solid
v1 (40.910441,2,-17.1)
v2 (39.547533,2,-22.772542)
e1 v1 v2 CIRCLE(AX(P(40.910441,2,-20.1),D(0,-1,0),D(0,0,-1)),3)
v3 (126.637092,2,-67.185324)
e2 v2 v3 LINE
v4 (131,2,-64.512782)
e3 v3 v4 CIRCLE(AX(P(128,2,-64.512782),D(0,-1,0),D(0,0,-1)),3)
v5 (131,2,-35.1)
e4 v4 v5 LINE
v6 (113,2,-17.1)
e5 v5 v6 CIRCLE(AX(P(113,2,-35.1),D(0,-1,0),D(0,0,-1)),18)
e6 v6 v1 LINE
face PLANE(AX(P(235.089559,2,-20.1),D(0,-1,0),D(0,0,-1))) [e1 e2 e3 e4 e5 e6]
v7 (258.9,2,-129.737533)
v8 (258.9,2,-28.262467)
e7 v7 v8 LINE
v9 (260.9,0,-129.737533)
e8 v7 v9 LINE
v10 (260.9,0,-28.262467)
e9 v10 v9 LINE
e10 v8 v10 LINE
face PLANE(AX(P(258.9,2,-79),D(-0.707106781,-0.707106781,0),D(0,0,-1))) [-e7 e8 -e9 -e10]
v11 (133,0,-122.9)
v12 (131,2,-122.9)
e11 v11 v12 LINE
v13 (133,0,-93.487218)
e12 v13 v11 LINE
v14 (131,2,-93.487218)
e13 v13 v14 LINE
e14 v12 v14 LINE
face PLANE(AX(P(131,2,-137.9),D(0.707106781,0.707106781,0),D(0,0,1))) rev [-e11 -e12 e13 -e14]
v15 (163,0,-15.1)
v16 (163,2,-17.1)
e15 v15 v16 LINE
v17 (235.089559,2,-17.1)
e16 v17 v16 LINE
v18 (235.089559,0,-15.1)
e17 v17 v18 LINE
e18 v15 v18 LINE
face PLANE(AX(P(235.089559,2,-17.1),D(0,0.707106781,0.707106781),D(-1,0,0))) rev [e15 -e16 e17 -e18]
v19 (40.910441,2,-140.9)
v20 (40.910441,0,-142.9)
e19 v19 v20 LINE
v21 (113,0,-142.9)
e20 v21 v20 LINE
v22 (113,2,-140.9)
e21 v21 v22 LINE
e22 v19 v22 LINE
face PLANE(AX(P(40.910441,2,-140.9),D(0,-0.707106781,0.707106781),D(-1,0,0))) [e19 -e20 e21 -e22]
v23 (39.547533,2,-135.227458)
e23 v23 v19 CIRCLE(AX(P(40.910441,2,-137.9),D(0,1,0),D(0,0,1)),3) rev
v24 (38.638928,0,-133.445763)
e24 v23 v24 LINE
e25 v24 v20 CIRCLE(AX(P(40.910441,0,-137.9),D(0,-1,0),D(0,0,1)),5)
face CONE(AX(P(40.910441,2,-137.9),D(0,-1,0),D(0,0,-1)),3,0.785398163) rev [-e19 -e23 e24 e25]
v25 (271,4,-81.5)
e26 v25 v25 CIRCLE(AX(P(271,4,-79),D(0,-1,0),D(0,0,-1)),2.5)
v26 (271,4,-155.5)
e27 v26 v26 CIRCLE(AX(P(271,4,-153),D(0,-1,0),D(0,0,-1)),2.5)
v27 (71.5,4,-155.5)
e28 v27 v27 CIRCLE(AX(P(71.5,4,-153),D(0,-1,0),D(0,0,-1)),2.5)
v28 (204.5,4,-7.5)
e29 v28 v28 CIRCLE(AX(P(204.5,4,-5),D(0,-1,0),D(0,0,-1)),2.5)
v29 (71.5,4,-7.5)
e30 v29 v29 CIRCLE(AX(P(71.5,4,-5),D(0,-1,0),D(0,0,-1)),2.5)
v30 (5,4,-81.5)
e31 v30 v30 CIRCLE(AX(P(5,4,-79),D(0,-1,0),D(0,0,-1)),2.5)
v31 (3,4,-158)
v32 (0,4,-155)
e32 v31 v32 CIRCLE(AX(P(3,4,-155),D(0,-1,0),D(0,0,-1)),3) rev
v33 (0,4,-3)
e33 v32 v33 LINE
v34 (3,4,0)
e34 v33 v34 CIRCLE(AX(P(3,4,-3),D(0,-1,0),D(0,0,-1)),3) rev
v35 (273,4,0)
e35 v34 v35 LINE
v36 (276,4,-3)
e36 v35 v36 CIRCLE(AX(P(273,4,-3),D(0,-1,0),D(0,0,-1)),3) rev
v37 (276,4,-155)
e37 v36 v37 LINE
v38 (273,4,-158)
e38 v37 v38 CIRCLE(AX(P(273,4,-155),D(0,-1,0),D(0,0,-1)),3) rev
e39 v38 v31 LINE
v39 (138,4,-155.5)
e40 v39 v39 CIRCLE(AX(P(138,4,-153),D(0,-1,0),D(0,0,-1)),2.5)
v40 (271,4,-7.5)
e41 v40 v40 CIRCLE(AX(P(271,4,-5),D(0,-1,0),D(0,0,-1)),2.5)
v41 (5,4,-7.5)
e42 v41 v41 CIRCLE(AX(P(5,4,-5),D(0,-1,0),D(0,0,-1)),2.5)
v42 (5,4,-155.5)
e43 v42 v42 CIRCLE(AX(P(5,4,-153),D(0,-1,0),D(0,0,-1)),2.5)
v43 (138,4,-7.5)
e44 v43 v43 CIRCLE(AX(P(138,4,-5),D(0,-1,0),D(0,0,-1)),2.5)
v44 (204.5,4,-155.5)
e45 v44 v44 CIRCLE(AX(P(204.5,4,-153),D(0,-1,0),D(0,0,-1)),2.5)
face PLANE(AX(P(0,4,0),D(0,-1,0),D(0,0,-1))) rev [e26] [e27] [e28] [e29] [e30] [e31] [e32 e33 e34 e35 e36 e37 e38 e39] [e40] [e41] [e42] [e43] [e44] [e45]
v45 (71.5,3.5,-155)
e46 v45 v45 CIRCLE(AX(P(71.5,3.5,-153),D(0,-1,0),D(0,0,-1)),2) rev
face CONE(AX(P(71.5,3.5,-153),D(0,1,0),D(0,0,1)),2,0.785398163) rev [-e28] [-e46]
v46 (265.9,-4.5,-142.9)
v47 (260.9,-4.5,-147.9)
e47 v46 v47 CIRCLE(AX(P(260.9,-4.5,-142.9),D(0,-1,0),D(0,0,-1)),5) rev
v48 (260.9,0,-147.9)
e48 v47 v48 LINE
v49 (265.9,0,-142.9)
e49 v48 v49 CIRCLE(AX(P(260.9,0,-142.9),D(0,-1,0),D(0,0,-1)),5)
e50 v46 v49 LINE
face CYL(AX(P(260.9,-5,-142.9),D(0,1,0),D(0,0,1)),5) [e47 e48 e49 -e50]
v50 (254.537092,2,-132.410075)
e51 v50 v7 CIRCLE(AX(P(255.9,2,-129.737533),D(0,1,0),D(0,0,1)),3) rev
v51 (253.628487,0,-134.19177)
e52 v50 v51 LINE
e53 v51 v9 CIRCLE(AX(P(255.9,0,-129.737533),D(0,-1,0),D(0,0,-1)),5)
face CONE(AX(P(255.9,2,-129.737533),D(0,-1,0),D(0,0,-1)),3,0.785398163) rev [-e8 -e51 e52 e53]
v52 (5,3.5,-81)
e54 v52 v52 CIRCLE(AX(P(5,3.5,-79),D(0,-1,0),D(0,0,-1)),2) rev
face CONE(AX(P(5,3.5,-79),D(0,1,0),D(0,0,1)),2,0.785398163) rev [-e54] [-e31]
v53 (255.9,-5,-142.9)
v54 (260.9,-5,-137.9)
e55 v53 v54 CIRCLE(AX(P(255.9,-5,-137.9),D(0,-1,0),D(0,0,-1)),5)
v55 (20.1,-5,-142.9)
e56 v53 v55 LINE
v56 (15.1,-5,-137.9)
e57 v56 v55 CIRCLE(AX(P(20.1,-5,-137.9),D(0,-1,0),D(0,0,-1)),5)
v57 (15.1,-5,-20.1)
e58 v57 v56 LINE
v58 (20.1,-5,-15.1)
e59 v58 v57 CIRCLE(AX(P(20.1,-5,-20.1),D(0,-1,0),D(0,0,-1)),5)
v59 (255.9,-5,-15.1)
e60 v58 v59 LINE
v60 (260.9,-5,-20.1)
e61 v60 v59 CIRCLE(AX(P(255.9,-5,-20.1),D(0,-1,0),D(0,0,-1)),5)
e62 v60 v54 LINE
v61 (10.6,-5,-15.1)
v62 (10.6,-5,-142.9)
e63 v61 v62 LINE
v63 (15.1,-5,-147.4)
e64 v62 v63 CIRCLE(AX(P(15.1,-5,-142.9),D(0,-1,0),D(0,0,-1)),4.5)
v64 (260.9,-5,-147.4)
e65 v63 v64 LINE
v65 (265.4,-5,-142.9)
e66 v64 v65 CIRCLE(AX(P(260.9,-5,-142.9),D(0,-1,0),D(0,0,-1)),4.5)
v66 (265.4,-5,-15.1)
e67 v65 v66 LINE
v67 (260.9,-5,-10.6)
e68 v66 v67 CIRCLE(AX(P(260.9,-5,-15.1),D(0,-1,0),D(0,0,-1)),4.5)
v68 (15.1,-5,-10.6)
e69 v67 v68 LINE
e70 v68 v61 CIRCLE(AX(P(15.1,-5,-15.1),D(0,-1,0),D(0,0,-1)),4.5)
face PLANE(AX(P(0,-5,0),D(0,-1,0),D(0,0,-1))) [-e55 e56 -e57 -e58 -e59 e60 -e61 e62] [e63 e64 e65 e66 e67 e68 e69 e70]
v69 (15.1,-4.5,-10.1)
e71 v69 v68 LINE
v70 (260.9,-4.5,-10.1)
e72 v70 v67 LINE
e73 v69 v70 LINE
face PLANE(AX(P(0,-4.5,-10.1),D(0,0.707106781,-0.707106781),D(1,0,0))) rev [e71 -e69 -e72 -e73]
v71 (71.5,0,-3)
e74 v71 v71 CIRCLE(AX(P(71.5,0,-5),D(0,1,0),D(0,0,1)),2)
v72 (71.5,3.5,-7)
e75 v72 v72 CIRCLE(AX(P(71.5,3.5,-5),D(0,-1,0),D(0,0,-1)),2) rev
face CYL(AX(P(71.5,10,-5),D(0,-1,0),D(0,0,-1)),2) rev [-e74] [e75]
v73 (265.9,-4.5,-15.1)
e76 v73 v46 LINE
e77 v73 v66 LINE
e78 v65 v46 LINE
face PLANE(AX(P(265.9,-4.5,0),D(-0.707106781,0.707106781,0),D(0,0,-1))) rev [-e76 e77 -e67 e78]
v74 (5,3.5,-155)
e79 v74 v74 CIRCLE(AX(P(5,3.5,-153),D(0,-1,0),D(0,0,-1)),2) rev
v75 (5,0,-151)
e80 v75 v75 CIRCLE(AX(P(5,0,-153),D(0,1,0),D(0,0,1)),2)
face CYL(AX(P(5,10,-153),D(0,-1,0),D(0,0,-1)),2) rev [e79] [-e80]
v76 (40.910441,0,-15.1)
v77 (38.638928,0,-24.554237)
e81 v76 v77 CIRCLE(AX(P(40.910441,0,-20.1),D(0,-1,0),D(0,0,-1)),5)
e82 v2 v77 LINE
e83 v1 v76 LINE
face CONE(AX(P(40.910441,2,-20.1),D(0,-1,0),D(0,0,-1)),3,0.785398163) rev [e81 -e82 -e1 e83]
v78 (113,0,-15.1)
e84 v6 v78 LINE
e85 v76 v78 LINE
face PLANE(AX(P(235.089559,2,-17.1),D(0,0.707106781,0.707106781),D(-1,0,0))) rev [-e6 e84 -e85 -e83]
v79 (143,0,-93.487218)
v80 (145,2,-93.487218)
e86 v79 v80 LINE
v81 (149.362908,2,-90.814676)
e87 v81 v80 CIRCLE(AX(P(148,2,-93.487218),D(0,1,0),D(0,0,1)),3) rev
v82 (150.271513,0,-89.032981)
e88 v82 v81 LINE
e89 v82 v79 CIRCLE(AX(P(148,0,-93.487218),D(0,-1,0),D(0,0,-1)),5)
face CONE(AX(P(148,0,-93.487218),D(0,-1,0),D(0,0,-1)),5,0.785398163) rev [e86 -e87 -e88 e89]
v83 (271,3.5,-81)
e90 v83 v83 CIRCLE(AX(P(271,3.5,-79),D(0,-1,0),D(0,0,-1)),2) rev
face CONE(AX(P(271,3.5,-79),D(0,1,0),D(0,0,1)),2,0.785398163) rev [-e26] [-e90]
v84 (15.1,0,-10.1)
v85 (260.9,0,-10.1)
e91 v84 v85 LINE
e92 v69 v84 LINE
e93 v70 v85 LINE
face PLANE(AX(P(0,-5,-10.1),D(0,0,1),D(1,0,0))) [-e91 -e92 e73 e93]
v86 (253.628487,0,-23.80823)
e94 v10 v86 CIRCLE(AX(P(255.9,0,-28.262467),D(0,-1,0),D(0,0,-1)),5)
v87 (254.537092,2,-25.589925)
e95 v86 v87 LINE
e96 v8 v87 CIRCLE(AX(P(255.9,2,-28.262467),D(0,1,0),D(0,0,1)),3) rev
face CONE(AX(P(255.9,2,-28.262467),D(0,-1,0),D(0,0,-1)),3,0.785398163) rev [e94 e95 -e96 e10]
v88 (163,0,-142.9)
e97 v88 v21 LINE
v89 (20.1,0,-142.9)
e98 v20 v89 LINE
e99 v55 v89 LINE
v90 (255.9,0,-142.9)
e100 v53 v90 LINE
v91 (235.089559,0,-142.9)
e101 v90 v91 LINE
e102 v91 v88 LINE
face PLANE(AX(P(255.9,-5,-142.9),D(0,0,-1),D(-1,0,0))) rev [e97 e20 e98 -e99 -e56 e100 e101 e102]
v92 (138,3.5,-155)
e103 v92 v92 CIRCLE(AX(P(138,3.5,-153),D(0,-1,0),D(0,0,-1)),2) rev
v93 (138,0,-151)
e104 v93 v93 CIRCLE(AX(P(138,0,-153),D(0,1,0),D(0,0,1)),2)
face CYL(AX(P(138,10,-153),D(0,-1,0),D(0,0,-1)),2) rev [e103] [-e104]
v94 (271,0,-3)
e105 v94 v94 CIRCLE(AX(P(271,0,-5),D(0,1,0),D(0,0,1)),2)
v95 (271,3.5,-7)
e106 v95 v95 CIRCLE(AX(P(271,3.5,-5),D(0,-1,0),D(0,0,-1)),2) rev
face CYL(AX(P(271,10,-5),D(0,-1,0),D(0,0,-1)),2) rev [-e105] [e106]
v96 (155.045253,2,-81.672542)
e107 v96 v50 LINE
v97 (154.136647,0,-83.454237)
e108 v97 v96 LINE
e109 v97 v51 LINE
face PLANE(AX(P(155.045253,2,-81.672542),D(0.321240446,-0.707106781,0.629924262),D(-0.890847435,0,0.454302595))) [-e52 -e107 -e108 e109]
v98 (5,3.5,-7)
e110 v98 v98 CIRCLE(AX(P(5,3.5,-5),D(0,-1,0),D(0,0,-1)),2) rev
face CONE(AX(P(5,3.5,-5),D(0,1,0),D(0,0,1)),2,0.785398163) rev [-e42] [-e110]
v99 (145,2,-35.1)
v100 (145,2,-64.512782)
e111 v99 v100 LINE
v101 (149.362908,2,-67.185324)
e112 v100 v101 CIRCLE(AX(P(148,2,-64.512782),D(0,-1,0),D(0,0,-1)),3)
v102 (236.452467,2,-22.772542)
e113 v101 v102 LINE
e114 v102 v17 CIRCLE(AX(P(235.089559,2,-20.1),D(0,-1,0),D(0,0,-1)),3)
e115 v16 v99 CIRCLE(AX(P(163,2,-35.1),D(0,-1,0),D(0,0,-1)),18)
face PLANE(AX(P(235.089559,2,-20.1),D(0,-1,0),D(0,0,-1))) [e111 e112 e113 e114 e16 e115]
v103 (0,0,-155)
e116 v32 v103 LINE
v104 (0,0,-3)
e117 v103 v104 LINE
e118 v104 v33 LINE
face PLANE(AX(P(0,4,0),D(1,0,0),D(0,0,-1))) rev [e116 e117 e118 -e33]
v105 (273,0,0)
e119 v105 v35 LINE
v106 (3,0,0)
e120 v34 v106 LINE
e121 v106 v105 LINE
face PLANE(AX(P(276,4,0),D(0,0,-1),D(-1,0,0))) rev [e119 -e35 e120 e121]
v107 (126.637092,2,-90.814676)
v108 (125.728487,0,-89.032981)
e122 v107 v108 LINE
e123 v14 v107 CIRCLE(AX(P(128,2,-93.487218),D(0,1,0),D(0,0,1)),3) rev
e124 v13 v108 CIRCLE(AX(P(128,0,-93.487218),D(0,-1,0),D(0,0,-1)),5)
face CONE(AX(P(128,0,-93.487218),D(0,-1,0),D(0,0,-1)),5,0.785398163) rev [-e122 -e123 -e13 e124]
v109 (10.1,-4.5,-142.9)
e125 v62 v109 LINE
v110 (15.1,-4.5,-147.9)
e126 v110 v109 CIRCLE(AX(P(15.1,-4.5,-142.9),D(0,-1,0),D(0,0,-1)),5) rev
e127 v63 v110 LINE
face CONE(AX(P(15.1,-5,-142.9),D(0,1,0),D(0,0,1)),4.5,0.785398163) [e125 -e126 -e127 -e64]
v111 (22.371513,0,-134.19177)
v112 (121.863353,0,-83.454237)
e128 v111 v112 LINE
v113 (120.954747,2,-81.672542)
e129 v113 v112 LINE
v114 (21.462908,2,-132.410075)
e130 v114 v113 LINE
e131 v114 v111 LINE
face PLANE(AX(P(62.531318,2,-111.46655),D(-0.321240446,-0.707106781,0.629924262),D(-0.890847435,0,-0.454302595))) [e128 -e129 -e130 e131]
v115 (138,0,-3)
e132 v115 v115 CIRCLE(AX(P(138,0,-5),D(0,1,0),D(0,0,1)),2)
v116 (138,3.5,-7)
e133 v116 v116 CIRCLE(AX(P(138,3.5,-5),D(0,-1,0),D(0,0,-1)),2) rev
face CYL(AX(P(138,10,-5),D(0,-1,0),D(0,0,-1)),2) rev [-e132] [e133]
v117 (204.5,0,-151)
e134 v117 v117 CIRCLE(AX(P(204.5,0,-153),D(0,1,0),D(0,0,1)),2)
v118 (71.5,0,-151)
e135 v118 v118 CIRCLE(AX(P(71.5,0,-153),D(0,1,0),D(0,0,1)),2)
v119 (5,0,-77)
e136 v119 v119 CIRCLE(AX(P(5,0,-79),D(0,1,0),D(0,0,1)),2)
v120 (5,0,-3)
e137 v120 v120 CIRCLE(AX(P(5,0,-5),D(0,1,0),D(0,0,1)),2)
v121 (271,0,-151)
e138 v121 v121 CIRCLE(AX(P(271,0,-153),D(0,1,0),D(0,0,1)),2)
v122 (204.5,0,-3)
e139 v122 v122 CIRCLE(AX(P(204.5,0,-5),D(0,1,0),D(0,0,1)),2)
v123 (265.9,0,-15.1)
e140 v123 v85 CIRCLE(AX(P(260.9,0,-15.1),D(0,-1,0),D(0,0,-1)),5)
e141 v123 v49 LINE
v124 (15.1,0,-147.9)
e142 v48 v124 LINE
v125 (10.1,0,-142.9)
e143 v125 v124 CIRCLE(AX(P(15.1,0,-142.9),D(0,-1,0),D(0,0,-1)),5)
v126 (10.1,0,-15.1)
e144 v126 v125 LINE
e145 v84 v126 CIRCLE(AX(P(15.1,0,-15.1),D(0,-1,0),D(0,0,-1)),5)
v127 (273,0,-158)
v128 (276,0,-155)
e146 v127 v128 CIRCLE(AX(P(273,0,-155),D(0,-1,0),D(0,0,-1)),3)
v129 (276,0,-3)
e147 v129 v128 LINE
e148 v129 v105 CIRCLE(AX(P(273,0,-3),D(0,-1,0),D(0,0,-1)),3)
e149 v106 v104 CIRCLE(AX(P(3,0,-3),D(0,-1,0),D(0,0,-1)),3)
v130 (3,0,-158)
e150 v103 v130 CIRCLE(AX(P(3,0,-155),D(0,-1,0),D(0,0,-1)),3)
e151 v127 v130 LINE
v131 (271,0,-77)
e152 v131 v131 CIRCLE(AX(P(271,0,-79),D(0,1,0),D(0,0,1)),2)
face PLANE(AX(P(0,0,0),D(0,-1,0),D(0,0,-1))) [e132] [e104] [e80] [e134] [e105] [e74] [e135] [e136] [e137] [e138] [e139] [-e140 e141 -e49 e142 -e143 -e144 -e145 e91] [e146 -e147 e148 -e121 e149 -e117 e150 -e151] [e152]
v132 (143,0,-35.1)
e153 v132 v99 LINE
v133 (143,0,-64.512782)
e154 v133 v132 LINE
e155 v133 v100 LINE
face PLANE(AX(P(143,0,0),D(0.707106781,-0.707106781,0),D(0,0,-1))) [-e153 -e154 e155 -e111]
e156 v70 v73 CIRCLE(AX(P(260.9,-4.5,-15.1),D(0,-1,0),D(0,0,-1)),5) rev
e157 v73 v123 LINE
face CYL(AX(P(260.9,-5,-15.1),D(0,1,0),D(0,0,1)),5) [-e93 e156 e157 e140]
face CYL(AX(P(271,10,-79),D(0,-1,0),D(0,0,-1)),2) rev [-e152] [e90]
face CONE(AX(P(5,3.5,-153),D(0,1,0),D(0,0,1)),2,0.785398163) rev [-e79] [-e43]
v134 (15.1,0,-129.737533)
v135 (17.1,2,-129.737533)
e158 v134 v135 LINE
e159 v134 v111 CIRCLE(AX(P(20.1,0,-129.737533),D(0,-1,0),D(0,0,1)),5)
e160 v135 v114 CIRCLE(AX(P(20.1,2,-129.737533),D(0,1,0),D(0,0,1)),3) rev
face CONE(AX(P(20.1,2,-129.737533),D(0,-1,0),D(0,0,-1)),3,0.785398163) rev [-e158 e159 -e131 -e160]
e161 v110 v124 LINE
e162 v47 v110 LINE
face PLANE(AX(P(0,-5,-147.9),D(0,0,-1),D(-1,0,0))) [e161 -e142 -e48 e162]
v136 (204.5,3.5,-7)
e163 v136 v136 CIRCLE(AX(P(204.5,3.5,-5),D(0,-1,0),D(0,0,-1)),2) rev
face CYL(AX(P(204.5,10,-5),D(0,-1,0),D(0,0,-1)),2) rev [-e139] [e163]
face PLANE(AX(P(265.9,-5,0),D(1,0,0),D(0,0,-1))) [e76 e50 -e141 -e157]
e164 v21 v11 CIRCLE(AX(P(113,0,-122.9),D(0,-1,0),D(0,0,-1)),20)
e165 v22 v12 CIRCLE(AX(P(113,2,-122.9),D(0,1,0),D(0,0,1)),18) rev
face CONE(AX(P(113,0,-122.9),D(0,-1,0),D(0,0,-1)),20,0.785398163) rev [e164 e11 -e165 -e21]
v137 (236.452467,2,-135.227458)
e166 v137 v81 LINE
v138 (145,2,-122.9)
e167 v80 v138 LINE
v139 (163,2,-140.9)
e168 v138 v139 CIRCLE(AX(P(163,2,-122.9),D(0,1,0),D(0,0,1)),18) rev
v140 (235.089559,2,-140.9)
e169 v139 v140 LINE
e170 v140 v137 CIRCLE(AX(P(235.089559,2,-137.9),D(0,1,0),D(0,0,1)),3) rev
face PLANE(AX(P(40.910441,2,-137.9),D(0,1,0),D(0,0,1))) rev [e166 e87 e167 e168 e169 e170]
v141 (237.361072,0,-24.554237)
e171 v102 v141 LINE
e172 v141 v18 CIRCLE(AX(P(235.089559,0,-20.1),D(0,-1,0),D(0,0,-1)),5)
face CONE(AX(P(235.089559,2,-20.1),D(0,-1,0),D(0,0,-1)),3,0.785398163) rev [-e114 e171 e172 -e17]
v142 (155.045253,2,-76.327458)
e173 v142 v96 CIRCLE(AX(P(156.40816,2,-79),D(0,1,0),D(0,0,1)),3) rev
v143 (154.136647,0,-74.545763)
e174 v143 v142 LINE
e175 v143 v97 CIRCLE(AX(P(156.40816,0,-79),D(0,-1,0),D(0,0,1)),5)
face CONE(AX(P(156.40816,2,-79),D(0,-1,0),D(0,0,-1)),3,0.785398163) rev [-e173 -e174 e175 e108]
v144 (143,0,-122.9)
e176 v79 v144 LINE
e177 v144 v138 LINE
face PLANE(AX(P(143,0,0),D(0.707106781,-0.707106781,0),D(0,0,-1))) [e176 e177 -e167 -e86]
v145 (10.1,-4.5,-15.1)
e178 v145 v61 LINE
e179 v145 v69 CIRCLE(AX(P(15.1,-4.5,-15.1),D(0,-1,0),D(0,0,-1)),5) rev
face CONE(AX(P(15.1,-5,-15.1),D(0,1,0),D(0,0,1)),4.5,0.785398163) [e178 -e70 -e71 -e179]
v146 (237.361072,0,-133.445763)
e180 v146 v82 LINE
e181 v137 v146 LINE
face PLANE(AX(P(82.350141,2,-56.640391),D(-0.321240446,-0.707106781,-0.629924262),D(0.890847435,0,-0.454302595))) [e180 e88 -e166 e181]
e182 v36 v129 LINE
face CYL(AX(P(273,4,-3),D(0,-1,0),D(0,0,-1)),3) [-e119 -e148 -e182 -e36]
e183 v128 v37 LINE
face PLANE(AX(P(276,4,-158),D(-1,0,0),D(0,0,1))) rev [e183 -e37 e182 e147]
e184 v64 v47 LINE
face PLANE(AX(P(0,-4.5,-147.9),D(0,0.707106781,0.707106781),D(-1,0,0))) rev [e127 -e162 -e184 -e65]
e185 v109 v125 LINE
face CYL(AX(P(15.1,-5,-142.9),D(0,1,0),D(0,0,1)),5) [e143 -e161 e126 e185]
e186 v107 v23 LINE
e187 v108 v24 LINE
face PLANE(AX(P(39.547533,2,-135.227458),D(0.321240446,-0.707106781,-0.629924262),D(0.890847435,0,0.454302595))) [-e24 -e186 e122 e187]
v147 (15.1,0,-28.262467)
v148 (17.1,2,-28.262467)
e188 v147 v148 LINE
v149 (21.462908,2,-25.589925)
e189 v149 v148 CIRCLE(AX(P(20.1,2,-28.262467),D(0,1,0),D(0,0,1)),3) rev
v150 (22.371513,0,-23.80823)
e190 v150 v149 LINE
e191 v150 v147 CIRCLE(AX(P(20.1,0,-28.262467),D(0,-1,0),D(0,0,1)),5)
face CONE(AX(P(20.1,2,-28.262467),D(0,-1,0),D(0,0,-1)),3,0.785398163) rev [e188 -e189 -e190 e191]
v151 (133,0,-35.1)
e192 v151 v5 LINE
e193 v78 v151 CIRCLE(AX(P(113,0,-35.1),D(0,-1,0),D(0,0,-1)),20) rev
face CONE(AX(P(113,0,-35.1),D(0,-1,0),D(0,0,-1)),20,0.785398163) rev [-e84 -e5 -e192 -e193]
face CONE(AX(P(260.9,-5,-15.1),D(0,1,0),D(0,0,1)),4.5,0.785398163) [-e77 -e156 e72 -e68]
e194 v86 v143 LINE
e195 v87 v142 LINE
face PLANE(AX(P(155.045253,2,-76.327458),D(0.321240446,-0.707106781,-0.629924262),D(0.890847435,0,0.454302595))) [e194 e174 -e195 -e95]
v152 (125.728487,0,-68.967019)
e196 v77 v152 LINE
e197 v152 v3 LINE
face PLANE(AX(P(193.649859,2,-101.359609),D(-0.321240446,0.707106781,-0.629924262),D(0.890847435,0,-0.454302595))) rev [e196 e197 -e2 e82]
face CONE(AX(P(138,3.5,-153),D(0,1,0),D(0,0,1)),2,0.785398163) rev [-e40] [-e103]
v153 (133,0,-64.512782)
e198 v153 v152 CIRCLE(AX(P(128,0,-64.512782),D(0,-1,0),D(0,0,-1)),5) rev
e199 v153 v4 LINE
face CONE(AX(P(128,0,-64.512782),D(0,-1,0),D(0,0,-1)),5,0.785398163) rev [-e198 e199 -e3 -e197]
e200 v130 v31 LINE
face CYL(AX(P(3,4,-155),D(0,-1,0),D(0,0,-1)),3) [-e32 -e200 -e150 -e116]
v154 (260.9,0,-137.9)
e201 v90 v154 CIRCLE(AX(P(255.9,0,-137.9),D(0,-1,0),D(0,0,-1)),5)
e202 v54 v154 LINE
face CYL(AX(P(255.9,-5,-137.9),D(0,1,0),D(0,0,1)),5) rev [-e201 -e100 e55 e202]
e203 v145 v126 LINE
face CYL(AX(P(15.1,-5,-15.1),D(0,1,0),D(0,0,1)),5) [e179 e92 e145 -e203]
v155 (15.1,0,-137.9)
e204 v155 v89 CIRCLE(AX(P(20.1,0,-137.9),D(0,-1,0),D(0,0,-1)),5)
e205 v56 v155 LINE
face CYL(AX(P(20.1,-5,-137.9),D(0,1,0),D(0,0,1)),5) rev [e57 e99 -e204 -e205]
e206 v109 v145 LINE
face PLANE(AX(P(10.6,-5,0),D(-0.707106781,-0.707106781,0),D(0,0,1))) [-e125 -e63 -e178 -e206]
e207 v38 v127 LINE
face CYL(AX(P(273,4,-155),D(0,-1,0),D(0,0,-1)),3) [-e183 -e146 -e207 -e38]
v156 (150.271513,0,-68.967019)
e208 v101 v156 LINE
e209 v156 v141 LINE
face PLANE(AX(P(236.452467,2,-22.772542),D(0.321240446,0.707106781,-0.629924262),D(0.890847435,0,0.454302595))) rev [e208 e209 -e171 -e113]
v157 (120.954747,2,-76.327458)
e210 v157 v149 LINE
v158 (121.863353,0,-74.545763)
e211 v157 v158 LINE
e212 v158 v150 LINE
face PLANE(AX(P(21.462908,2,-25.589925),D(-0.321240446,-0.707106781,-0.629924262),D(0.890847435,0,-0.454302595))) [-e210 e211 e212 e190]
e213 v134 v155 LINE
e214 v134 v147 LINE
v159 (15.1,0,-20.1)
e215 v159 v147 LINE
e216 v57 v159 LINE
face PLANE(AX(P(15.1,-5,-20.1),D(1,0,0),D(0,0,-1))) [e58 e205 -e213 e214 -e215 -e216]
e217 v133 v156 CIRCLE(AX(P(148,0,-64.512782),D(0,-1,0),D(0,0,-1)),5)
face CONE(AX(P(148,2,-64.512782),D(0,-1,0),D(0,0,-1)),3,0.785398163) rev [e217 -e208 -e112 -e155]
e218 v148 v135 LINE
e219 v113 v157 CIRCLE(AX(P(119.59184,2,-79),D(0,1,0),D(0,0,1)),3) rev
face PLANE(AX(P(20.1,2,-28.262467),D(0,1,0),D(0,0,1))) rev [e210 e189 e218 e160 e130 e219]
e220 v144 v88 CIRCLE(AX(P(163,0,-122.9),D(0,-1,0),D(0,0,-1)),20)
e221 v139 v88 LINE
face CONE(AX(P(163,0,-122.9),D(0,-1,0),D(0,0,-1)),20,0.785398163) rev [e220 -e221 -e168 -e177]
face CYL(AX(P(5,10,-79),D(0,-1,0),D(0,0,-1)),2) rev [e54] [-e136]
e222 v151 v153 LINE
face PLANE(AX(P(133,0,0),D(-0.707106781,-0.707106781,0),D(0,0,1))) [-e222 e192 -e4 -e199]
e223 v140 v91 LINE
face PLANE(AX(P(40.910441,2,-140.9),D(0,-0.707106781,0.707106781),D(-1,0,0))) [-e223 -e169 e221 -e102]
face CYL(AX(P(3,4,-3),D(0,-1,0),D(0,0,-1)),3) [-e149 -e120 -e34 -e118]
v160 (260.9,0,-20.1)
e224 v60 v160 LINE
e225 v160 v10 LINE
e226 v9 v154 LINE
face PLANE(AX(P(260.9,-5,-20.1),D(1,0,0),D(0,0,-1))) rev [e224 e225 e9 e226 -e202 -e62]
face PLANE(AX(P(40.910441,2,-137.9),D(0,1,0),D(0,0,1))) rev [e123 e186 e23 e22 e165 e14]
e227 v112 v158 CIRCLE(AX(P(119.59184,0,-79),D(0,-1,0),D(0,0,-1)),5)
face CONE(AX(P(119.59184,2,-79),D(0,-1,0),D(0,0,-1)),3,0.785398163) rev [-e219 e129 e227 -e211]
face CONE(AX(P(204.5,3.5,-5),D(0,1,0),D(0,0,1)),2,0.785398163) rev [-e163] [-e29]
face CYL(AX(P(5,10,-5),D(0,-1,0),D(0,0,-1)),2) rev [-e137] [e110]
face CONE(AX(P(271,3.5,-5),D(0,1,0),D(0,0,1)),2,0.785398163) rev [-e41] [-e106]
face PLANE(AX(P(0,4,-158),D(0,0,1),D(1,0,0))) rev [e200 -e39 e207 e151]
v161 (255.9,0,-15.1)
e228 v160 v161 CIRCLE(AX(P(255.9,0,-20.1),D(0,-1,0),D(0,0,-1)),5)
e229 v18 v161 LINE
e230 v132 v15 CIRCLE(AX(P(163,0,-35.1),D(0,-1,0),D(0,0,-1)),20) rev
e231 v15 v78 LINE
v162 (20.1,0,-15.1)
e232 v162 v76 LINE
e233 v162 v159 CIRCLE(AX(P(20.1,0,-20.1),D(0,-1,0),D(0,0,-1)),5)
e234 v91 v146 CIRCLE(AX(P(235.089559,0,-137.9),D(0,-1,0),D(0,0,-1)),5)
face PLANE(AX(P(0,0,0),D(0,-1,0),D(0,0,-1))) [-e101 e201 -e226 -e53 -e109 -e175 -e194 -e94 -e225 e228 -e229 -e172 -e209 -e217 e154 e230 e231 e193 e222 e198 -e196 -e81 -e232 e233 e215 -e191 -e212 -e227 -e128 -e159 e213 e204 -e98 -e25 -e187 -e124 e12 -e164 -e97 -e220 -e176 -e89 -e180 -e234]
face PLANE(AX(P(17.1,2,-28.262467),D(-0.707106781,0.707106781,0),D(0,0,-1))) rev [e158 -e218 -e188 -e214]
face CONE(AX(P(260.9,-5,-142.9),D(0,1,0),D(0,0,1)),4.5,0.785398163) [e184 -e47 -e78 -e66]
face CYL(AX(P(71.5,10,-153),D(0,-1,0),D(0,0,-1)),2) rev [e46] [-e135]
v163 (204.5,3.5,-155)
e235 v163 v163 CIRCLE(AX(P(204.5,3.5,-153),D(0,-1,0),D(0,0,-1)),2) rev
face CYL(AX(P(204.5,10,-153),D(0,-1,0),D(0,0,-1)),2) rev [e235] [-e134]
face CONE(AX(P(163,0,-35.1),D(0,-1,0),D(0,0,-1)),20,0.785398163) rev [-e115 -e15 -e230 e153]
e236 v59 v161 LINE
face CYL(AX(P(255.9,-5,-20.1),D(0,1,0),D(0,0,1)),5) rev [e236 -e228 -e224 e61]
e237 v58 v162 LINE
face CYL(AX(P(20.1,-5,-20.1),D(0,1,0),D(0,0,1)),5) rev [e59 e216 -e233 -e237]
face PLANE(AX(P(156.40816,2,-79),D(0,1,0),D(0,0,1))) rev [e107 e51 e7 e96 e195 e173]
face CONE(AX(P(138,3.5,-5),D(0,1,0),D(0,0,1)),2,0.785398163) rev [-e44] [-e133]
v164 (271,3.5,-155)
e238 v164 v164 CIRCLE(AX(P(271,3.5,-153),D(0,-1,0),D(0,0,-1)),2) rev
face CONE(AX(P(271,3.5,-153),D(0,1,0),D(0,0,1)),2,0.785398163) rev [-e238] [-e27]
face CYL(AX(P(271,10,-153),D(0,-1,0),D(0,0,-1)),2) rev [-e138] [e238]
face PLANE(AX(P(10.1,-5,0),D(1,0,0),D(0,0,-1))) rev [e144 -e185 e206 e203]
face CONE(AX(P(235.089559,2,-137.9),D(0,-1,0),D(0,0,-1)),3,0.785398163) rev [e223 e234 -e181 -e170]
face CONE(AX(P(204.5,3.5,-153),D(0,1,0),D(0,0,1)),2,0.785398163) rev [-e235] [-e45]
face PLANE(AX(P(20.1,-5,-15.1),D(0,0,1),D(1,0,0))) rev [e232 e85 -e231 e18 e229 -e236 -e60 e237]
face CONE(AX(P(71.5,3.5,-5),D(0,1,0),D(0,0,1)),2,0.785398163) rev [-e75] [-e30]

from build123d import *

# Parameters (mm, degrees)
SKETCH1_W                 = 276
SKETCH1_H                 = 158
BOSS_EXTRUDE1_DEPTH       = 4
SKETCH2_R                 = 2
CUT_EXTRUDE1_DEPTH        = 10
LPATTERN1_COUNT           = 2
LPATTERN1_PITCH           = 74
LPATTERN1_COL_COUNT       = 2
LPATTERN1_COL_PITCH       = 74
LPATTERN2_COUNT           = 5
LPATTERN2_PITCH           = 66.5
LPATTERN2_COPY_1_SKETCH_R = 2
LPATTERN2_COPY_1_DEPTH    = 10
LPATTERN2_COPY_2_SKETCH_R = 2
LPATTERN2_COPY_2_DEPTH    = 10
LPATTERN2_COPY_3_SKETCH_R = 2
LPATTERN2_COPY_3_DEPTH    = 10
LPATTERN2_COPY_4_SKETCH_R = 2
LPATTERN2_COPY_4_DEPTH    = 10
LPATTERN2_COPY_5_SKETCH_R = 2
LPATTERN2_COPY_5_DEPTH    = 10
LPATTERN2_COPY_6_SKETCH_R = 2
LPATTERN2_COPY_6_DEPTH    = 10
LPATTERN2_COPY_7_SKETCH_R = 2
LPATTERN2_COPY_7_DEPTH    = 10
LPATTERN2_COPY_8_SKETCH_R = 2
LPATTERN2_COPY_8_DEPTH    = 10
FILLET1_R                 = 3
SKETCH3_W                 = 200.387432082
SKETCH3_H                 = 94.542877392
BOSS_EXTRUDE2_DEPTH       = 4
CHAMFER1_SIZE             = 0.5
BOSS_EXTRUDE3_DEPTH       = 5
CUT_EXTRUDE2_DEPTH        = 2
SKETCH6_W                 = 10
SKETCH6_H                 = 20
BOSS_EXTRUDE4_DEPTH       = 3
CHAMFER2_SIZE             = 0.5
CHAMFER4_SIZE             = 2


with BuildPart() as part:
    # Sketch1 → Boss-Extrude1 (new body)
    with BuildSketch(Plane(origin=(0, 0, 0), x_dir=(1, 0, 0), z_dir=(0, 1, 0))):
        with Locations((138, 79)):
            Rectangle(SKETCH1_W, SKETCH1_H)
    extrude(amount=BOSS_EXTRUDE1_DEPTH)

    # Sketch2 → Cut-Extrude1 (cut)
    with BuildSketch(Plane(origin=(0, 0, 0), x_dir=(1, 0, 0), z_dir=(0, 1, 0))):
        with Locations(Location((5, 79, 0), (0, 0, 90))):
            Circle(SKETCH2_R)
    cut_extrude1 = extrude(amount=CUT_EXTRUDE1_DEPTH, mode=Mode.SUBTRACT)

    # LPattern1: Cut-Extrude1 ×2
    with Locations(*[(0, 0, i * LPATTERN1_PITCH) for i in range(1, LPATTERN1_COUNT)]):
        add(cut_extrude1, mode=Mode.SUBTRACT)

    # LPattern1 col: Cut-Extrude1 ×2
    with Locations(*[(0, 0, -i * LPATTERN1_COL_PITCH) for i in range(1, LPATTERN1_COL_COUNT)]):
        add(cut_extrude1, mode=Mode.SUBTRACT)

    # LPattern2: Cut-Extrude1 ×5
    with Locations(*[(i * LPATTERN2_PITCH, 0, 0) for i in range(1, LPATTERN2_COUNT)]):
        add(cut_extrude1, mode=Mode.SUBTRACT)

    # LPattern2 copy 1 sketch → LPattern2 copy 1 (cut)
    with BuildSketch(Plane(origin=(66.5, 0, 74), x_dir=(1, 0, 0), z_dir=(0, 1, 0))):
        with Locations(Location((5, 79, 0), (0, 0, 90))):
            Circle(LPATTERN2_COPY_1_SKETCH_R)
    extrude(amount=LPATTERN2_COPY_1_DEPTH, mode=Mode.SUBTRACT)

    # LPattern2 copy 2 sketch → LPattern2 copy 2 (cut)
    with BuildSketch(Plane(origin=(133, 0, 74), x_dir=(1, 0, 0), z_dir=(0, 1, 0))):
        with Locations(Location((5, 79, 0), (0, 0, 90))):
            Circle(LPATTERN2_COPY_2_SKETCH_R)
    extrude(amount=LPATTERN2_COPY_2_DEPTH, mode=Mode.SUBTRACT)

    # LPattern2 copy 3 sketch → LPattern2 copy 3 (cut)
    with BuildSketch(Plane(origin=(199.5, 0, 74), x_dir=(1, 0, 0), z_dir=(0, 1, 0))):
        with Locations(Location((5, 79, 0), (0, 0, 90))):
            Circle(LPATTERN2_COPY_3_SKETCH_R)
    extrude(amount=LPATTERN2_COPY_3_DEPTH, mode=Mode.SUBTRACT)

    # LPattern2 copy 4 sketch → LPattern2 copy 4 (cut)
    with BuildSketch(Plane(origin=(266, 0, 74), x_dir=(1, 0, 0), z_dir=(0, 1, 0))):
        with Locations(Location((5, 79, 0), (0, 0, 90))):
            Circle(LPATTERN2_COPY_4_SKETCH_R)
    extrude(amount=LPATTERN2_COPY_4_DEPTH, mode=Mode.SUBTRACT)

    # LPattern2 copy 5 sketch → LPattern2 copy 5 (cut)
    with BuildSketch(Plane(origin=(66.5, 0, -74), x_dir=(1, 0, 0), z_dir=(0, 1, 0))):
        with Locations(Location((5, 79, 0), (0, 0, 90))):
            Circle(LPATTERN2_COPY_5_SKETCH_R)
    extrude(amount=LPATTERN2_COPY_5_DEPTH, mode=Mode.SUBTRACT)

    # LPattern2 copy 6 sketch → LPattern2 copy 6 (cut)
    with BuildSketch(Plane(origin=(133, 0, -74), x_dir=(1, 0, 0), z_dir=(0, 1, 0))):
        with Locations(Location((5, 79, 0), (0, 0, 90))):
            Circle(LPATTERN2_COPY_6_SKETCH_R)
    extrude(amount=LPATTERN2_COPY_6_DEPTH, mode=Mode.SUBTRACT)

    # LPattern2 copy 7 sketch → LPattern2 copy 7 (cut)
    with BuildSketch(Plane(origin=(199.5, 0, -74), x_dir=(1, 0, 0), z_dir=(0, 1, 0))):
        with Locations(Location((5, 79, 0), (0, 0, 90))):
            Circle(LPATTERN2_COPY_7_SKETCH_R)
    extrude(amount=LPATTERN2_COPY_7_DEPTH, mode=Mode.SUBTRACT)

    # LPattern2 copy 8 sketch → LPattern2 copy 8 (cut)
    with BuildSketch(Plane(origin=(266, 0, -74), x_dir=(1, 0, 0), z_dir=(0, 1, 0))):
        with Locations(Location((5, 79, 0), (0, 0, 90))):
            Circle(LPATTERN2_COPY_8_SKETCH_R)
    extrude(amount=LPATTERN2_COPY_8_DEPTH, mode=Mode.SUBTRACT)

    # Fillet1
    fillet1_edges = [part.edges().sort_by_distance(p)[0] for p in [
        (0, 2, 0),
        (0, 2, -158),
        (276, 2, -158),
        (276, 2, 0),
    ]]
    fillet(fillet1_edges, radius=FILLET1_R)

    # Sketch3 → Boss-Extrude2 (add)
    with BuildSketch(Plane(origin=(0, 0, 0), x_dir=(1, 0, 0), z_dir=(0, 1, 0))):
        with Locations((130.827781715, 79.217339948)):
            Rectangle(SKETCH3_W, SKETCH3_H)
    extrude(amount=BOSS_EXTRUDE2_DEPTH)

    # Chamfer1
    chamfer1_edges = [part.edges().sort_by_distance(p)[0] for p in [
        (5, 4, -77),
        (5, 4, -3),
        (5, 4, -151),
        (71.5, 4, -3),
        (138, 4, -3),
        (204.5, 4, -3),
        (271, 4, -3),
        (271, 4, -77),
        (71.5, 4, -151),
        (138, 4, -151),
        (204.5, 4, -151),
        (271, 4, -151),
    ]]
    chamfer(chamfer1_edges, length=CHAMFER1_SIZE)

    # Sketch4 → Boss-Extrude3 (add)
    with BuildSketch(Plane.XZ):
        with BuildLine():
            Line((10.1, -15.1), (10.1, -142.9))
            ThreePointArc((10.1, -142.9), (11.564466094, -146.435533906), (15.1, -147.9))
            Line((15.1, -147.9), (260.9, -147.9))
            ThreePointArc((260.9, -147.9), (264.435533906, -146.435533906), (265.9, -142.9))
            Line((265.9, -142.9), (265.9, -15.1))
            ThreePointArc((265.9, -15.1), (264.435533906, -11.564466094), (260.9, -10.1))
            Line((260.9, -10.1), (15.1, -10.1))
            ThreePointArc((15.1, -10.1), (11.564466094, -11.564466094), (10.1, -15.1))
        make_face()
        with BuildLine():
            Line((15.1, -20.1), (15.1, -137.9))
            ThreePointArc((15.1, -137.9), (16.564466094, -141.435533906), (20.1, -142.9))
            Line((20.1, -142.9), (255.9, -142.9))
            ThreePointArc((255.9, -142.9), (259.435533906, -141.435533906), (260.9, -137.9))
            Line((260.9, -137.9), (260.9, -20.1))
            ThreePointArc((260.9, -20.1), (259.435533906, -16.564466094), (255.9, -15.1))
            Line((255.9, -15.1), (20.1, -15.1))
            ThreePointArc((20.1, -15.1), (16.564466094, -16.564466094), (15.1, -20.1))
        make_face(mode=Mode.SUBTRACT)
    extrude(amount=BOSS_EXTRUDE3_DEPTH)

    # Sketch5 → Cut-Extrude2 (cut)
    with BuildSketch(Plane.XZ):
        with BuildLine():
            Line((40.910440594, -142.9), (235.089559406, -142.9))
            ThreePointArc((235.089559406, -142.9), (239.951204492, -139.068078365), (237.361072383, -133.445762827))
            Line((237.361072383, -133.445762827), (140.271512977, -83.933313096))
            ThreePointArc((140.271512977, -83.933313096), (138, -83.387550269), (135.728487023, -83.933313096))
            Line((135.728487023, -83.933313096), (38.638927617, -133.445762827))
            ThreePointArc((38.638927617, -133.445762827), (36.048795508, -139.068078365), (40.910440594, -142.9))
        make_face()
        with BuildLine():
            Line((22.371512977, -134.19176996), (121.863352514, -83.454237173))
            ThreePointArc((121.863352514, -83.454237173), (124.591839537, -79), (121.863352514, -74.545762827))
            Line((121.863352514, -74.545762827), (22.371512977, -23.80823004))
            ThreePointArc((22.371512977, -23.80823004), (17.488253926, -23.998808873), (15.1, -28.262467213))
            Line((15.1, -28.262467213), (15.1, -129.737532787))
            ThreePointArc((15.1, -129.737532787), (17.488253926, -134.001191127), (22.371512977, -134.19176996))
        make_face()
        with BuildLine():
            Line((38.638927617, -24.554237173), (135.728487023, -74.066686904))
            ThreePointArc((135.728487023, -74.066686904), (138, -74.612449731), (140.271512977, -74.066686904))
            Line((140.271512977, -74.066686904), (237.361072383, -24.554237173))
            ThreePointArc((237.361072383, -24.554237173), (239.951204492, -18.931921635), (235.089559406, -15.1))
            Line((235.089559406, -15.1), (40.910440594, -15.1))
            ThreePointArc((40.910440594, -15.1), (36.048795508, -18.931921635), (38.638927617, -24.554237173))
        make_face()
        with BuildLine():
            Line((253.628487023, -134.19176996), (154.136647486, -83.454237173))
            ThreePointArc((154.136647486, -83.454237173), (151.408160463, -79), (154.136647486, -74.545762827))
            Line((154.136647486, -74.545762827), (253.628487023, -23.80823004))
            ThreePointArc((253.628487023, -23.80823004), (258.511746074, -23.998808873), (260.9, -28.262467213))
            Line((260.9, -28.262467213), (260.9, -129.737532787))
            ThreePointArc((260.9, -129.737532787), (258.511746074, -134.001191127), (253.628487023, -134.19176996))
        make_face()
    extrude(amount=-CUT_EXTRUDE2_DEPTH, mode=Mode.SUBTRACT)

    # Sketch6 → Boss-Extrude4 (add)
    with BuildSketch(Plane.XZ):
        with BuildLine():
            ThreePointArc((113, -142.9), (127.142135624, -137.042135624), (133, -122.9))
            Line((133, -122.9), (133, -142.9))
            Line((133, -142.9), (113, -142.9))
        make_face()
        with Locations((138, -132.9)):
            Rectangle(SKETCH6_W, SKETCH6_H)
        with BuildLine():
            Line((135.728487023, -83.933313096), (125.728487023, -89.03298087))
            ThreePointArc((125.728487023, -89.03298087), (130.611746074, -89.223559703), (133, -93.487218044))
            Line((133, -93.487218044), (133, -122.9))
            Line((133, -122.9), (143, -122.9))
            Line((143, -122.9), (143, -93.487218044))
            ThreePointArc((143, -93.487218044), (145.388253926, -89.223559703), (150.271512977, -89.03298087))
            Line((150.271512977, -89.03298087), (140.271512977, -83.933313096))
            ThreePointArc((140.271512977, -83.933313096), (138, -83.387550269), (135.728487023, -83.933313096))
        make_face()
        with BuildLine():
            Line((135.728487023, -74.066686904), (125.728487023, -68.96701913))
            Line((125.728487023, -68.96701913), (113, -62.475913621))
            Line((113, -62.475913621), (110.613147943, -64.512781956))
            Line((110.613147943, -64.512781956), (122.461258792, -72.009957731))
            Line((122.461258792, -72.009957731), (128, -82.174730427))
            Line((128, -82.174730427), (113, -91.109371395))
            Line((113, -91.109371395), (113, -95.524086379))
            Line((113, -95.524086379), (125.728487023, -89.03298087))
            Line((125.728487023, -89.03298087), (135.728487023, -83.933313096))
            ThreePointArc((135.728487023, -83.933313096), (138, -83.387550269), (140.271512977, -83.933313096))
            Line((140.271512977, -83.933313096), (150.271512977, -89.03298087))
            Line((150.271512977, -89.03298087), (163, -95.524086379))
            Line((163, -95.524086379), (165.532803615, -91.72866376))
            Line((165.532803615, -91.72866376), (149.718388123, -83.663837255))
            Line((149.718388123, -83.663837255), (150.271512977, -73.75803966))
            Line((150.271512977, -73.75803966), (164.221383124, -63.907160193))
            Line((164.221383124, -63.907160193), (163, -62.475913621))
            Line((163, -62.475913621), (150.271512977, -68.96701913))
            Line((150.271512977, -68.96701913), (140.271512977, -74.066686904))
            ThreePointArc((140.271512977, -74.066686904), (138, -74.612449731), (135.728487023, -74.066686904))
        make_face()
        with BuildLine():
            Line((143, -15.1), (133, -15.1))
            Line((133, -15.1), (133, -35.1))
            Line((133, -35.1), (133, -64.512781956))
            ThreePointArc((133, -64.512781956), (130.611746074, -68.776440297), (125.728487023, -68.96701913))
            Line((125.728487023, -68.96701913), (135.728487023, -74.066686904))
            ThreePointArc((135.728487023, -74.066686904), (138, -74.612449731), (140.271512977, -74.066686904))
            Line((140.271512977, -74.066686904), (150.271512977, -68.96701913))
            ThreePointArc((150.271512977, -68.96701913), (145.388253926, -68.776440297), (143, -64.512781956))
            Line((143, -64.512781956), (143, -35.1))
            Line((143, -35.1), (143, -15.1))
        make_face()
        with BuildLine():
            Line((133, -35.1), (133, -15.1))
            Line((133, -15.1), (113, -15.1))
            ThreePointArc((113, -15.1), (127.142135624, -20.957864376), (133, -35.1))
        make_face()
        with BuildLine():
            Line((163, -15.1), (143, -15.1))
            Line((143, -15.1), (143, -35.1))
            ThreePointArc((143, -35.1), (148.857864376, -20.957864376), (163, -15.1))
        make_face()
        with BuildLine():
            ThreePointArc((143, -122.9), (148.857864376, -137.042135624), (163, -142.9))
            Line((163, -142.9), (143, -142.9))
            Line((143, -142.9), (143, -122.9))
        make_face()
    extrude(amount=-BOSS_EXTRUDE4_DEPTH)

    # Chamfer2
    chamfer2_edges = [part.edges().sort_by_distance(p)[0] for p in [
        (11.564466094, -5, -11.564466094),
        (10.1, -5, -79),
        (11.564466094, -5, -146.435533906),
        (264.435533906, -5, -146.435533906),
        (264.435533906, -5, -11.564466094),
        (138, -5, -10.1),
        (138, -5, -147.9),
        (265.9, -5, -79),
    ]]
    chamfer(chamfer2_edges, length=CHAMFER2_SIZE)

    # Chamfer4
    chamfer4_edges = [part.edges().sort_by_distance(p)[0] for p in [
        (199.044779703, 2, -15.1),
        (239.951204492, 2, -18.931921635),
        (193.81629268, 2, -46.760628151),
        (145.388253926, 2, -68.776440297),
        (143, 2, -49.806390978),
        (148.857864376, 2, -20.957864376),
        (82.18370732, 2, -46.760628151),
        (36.048795508, 2, -18.931921635),
        (76.955220297, 2, -15.1),
        (127.142135624, 2, -20.957864376),
        (133, 2, -49.806390978),
        (130.611746074, 2, -68.776440297),
        (72.117432745, 2, -49.176996433),
        (124.591839537, 2, -79),
        (72.117432745, 2, -108.823003567),
        (17.488253926, 2, -134.001191127),
        (15.1, 2, -79),
        (17.488253926, 2, -23.998808873),
        (76.955220297, 2, -142.9),
        (36.048795508, 2, -139.068078365),
        (82.18370732, 2, -111.239371849),
        (130.611746074, 2, -89.223559703),
        (133, 2, -108.193609022),
        (127.142135624, 2, -137.042135624),
        (193.81629268, 2, -111.239371849),
        (239.951204492, 2, -139.068078365),
        (199.044779703, 2, -142.9),
        (148.857864376, 2, -137.042135624),
        (143, 2, -108.193609022),
        (145.388253926, 2, -89.223559703),
        (258.511746074, 2, -23.998808873),
        (203.882567255, 2, -49.176996433),
        (260.9, 2, -79),
        (151.408160463, 2, -79),
        (258.511746074, 2, -134.001191127),
        (203.882567255, 2, -108.823003567),
    ]]
    chamfer(chamfer4_edges, length=CHAMFER4_SIZE - 0.0001)  # a hair under: the kernel refuses the full size


solid = part.part
